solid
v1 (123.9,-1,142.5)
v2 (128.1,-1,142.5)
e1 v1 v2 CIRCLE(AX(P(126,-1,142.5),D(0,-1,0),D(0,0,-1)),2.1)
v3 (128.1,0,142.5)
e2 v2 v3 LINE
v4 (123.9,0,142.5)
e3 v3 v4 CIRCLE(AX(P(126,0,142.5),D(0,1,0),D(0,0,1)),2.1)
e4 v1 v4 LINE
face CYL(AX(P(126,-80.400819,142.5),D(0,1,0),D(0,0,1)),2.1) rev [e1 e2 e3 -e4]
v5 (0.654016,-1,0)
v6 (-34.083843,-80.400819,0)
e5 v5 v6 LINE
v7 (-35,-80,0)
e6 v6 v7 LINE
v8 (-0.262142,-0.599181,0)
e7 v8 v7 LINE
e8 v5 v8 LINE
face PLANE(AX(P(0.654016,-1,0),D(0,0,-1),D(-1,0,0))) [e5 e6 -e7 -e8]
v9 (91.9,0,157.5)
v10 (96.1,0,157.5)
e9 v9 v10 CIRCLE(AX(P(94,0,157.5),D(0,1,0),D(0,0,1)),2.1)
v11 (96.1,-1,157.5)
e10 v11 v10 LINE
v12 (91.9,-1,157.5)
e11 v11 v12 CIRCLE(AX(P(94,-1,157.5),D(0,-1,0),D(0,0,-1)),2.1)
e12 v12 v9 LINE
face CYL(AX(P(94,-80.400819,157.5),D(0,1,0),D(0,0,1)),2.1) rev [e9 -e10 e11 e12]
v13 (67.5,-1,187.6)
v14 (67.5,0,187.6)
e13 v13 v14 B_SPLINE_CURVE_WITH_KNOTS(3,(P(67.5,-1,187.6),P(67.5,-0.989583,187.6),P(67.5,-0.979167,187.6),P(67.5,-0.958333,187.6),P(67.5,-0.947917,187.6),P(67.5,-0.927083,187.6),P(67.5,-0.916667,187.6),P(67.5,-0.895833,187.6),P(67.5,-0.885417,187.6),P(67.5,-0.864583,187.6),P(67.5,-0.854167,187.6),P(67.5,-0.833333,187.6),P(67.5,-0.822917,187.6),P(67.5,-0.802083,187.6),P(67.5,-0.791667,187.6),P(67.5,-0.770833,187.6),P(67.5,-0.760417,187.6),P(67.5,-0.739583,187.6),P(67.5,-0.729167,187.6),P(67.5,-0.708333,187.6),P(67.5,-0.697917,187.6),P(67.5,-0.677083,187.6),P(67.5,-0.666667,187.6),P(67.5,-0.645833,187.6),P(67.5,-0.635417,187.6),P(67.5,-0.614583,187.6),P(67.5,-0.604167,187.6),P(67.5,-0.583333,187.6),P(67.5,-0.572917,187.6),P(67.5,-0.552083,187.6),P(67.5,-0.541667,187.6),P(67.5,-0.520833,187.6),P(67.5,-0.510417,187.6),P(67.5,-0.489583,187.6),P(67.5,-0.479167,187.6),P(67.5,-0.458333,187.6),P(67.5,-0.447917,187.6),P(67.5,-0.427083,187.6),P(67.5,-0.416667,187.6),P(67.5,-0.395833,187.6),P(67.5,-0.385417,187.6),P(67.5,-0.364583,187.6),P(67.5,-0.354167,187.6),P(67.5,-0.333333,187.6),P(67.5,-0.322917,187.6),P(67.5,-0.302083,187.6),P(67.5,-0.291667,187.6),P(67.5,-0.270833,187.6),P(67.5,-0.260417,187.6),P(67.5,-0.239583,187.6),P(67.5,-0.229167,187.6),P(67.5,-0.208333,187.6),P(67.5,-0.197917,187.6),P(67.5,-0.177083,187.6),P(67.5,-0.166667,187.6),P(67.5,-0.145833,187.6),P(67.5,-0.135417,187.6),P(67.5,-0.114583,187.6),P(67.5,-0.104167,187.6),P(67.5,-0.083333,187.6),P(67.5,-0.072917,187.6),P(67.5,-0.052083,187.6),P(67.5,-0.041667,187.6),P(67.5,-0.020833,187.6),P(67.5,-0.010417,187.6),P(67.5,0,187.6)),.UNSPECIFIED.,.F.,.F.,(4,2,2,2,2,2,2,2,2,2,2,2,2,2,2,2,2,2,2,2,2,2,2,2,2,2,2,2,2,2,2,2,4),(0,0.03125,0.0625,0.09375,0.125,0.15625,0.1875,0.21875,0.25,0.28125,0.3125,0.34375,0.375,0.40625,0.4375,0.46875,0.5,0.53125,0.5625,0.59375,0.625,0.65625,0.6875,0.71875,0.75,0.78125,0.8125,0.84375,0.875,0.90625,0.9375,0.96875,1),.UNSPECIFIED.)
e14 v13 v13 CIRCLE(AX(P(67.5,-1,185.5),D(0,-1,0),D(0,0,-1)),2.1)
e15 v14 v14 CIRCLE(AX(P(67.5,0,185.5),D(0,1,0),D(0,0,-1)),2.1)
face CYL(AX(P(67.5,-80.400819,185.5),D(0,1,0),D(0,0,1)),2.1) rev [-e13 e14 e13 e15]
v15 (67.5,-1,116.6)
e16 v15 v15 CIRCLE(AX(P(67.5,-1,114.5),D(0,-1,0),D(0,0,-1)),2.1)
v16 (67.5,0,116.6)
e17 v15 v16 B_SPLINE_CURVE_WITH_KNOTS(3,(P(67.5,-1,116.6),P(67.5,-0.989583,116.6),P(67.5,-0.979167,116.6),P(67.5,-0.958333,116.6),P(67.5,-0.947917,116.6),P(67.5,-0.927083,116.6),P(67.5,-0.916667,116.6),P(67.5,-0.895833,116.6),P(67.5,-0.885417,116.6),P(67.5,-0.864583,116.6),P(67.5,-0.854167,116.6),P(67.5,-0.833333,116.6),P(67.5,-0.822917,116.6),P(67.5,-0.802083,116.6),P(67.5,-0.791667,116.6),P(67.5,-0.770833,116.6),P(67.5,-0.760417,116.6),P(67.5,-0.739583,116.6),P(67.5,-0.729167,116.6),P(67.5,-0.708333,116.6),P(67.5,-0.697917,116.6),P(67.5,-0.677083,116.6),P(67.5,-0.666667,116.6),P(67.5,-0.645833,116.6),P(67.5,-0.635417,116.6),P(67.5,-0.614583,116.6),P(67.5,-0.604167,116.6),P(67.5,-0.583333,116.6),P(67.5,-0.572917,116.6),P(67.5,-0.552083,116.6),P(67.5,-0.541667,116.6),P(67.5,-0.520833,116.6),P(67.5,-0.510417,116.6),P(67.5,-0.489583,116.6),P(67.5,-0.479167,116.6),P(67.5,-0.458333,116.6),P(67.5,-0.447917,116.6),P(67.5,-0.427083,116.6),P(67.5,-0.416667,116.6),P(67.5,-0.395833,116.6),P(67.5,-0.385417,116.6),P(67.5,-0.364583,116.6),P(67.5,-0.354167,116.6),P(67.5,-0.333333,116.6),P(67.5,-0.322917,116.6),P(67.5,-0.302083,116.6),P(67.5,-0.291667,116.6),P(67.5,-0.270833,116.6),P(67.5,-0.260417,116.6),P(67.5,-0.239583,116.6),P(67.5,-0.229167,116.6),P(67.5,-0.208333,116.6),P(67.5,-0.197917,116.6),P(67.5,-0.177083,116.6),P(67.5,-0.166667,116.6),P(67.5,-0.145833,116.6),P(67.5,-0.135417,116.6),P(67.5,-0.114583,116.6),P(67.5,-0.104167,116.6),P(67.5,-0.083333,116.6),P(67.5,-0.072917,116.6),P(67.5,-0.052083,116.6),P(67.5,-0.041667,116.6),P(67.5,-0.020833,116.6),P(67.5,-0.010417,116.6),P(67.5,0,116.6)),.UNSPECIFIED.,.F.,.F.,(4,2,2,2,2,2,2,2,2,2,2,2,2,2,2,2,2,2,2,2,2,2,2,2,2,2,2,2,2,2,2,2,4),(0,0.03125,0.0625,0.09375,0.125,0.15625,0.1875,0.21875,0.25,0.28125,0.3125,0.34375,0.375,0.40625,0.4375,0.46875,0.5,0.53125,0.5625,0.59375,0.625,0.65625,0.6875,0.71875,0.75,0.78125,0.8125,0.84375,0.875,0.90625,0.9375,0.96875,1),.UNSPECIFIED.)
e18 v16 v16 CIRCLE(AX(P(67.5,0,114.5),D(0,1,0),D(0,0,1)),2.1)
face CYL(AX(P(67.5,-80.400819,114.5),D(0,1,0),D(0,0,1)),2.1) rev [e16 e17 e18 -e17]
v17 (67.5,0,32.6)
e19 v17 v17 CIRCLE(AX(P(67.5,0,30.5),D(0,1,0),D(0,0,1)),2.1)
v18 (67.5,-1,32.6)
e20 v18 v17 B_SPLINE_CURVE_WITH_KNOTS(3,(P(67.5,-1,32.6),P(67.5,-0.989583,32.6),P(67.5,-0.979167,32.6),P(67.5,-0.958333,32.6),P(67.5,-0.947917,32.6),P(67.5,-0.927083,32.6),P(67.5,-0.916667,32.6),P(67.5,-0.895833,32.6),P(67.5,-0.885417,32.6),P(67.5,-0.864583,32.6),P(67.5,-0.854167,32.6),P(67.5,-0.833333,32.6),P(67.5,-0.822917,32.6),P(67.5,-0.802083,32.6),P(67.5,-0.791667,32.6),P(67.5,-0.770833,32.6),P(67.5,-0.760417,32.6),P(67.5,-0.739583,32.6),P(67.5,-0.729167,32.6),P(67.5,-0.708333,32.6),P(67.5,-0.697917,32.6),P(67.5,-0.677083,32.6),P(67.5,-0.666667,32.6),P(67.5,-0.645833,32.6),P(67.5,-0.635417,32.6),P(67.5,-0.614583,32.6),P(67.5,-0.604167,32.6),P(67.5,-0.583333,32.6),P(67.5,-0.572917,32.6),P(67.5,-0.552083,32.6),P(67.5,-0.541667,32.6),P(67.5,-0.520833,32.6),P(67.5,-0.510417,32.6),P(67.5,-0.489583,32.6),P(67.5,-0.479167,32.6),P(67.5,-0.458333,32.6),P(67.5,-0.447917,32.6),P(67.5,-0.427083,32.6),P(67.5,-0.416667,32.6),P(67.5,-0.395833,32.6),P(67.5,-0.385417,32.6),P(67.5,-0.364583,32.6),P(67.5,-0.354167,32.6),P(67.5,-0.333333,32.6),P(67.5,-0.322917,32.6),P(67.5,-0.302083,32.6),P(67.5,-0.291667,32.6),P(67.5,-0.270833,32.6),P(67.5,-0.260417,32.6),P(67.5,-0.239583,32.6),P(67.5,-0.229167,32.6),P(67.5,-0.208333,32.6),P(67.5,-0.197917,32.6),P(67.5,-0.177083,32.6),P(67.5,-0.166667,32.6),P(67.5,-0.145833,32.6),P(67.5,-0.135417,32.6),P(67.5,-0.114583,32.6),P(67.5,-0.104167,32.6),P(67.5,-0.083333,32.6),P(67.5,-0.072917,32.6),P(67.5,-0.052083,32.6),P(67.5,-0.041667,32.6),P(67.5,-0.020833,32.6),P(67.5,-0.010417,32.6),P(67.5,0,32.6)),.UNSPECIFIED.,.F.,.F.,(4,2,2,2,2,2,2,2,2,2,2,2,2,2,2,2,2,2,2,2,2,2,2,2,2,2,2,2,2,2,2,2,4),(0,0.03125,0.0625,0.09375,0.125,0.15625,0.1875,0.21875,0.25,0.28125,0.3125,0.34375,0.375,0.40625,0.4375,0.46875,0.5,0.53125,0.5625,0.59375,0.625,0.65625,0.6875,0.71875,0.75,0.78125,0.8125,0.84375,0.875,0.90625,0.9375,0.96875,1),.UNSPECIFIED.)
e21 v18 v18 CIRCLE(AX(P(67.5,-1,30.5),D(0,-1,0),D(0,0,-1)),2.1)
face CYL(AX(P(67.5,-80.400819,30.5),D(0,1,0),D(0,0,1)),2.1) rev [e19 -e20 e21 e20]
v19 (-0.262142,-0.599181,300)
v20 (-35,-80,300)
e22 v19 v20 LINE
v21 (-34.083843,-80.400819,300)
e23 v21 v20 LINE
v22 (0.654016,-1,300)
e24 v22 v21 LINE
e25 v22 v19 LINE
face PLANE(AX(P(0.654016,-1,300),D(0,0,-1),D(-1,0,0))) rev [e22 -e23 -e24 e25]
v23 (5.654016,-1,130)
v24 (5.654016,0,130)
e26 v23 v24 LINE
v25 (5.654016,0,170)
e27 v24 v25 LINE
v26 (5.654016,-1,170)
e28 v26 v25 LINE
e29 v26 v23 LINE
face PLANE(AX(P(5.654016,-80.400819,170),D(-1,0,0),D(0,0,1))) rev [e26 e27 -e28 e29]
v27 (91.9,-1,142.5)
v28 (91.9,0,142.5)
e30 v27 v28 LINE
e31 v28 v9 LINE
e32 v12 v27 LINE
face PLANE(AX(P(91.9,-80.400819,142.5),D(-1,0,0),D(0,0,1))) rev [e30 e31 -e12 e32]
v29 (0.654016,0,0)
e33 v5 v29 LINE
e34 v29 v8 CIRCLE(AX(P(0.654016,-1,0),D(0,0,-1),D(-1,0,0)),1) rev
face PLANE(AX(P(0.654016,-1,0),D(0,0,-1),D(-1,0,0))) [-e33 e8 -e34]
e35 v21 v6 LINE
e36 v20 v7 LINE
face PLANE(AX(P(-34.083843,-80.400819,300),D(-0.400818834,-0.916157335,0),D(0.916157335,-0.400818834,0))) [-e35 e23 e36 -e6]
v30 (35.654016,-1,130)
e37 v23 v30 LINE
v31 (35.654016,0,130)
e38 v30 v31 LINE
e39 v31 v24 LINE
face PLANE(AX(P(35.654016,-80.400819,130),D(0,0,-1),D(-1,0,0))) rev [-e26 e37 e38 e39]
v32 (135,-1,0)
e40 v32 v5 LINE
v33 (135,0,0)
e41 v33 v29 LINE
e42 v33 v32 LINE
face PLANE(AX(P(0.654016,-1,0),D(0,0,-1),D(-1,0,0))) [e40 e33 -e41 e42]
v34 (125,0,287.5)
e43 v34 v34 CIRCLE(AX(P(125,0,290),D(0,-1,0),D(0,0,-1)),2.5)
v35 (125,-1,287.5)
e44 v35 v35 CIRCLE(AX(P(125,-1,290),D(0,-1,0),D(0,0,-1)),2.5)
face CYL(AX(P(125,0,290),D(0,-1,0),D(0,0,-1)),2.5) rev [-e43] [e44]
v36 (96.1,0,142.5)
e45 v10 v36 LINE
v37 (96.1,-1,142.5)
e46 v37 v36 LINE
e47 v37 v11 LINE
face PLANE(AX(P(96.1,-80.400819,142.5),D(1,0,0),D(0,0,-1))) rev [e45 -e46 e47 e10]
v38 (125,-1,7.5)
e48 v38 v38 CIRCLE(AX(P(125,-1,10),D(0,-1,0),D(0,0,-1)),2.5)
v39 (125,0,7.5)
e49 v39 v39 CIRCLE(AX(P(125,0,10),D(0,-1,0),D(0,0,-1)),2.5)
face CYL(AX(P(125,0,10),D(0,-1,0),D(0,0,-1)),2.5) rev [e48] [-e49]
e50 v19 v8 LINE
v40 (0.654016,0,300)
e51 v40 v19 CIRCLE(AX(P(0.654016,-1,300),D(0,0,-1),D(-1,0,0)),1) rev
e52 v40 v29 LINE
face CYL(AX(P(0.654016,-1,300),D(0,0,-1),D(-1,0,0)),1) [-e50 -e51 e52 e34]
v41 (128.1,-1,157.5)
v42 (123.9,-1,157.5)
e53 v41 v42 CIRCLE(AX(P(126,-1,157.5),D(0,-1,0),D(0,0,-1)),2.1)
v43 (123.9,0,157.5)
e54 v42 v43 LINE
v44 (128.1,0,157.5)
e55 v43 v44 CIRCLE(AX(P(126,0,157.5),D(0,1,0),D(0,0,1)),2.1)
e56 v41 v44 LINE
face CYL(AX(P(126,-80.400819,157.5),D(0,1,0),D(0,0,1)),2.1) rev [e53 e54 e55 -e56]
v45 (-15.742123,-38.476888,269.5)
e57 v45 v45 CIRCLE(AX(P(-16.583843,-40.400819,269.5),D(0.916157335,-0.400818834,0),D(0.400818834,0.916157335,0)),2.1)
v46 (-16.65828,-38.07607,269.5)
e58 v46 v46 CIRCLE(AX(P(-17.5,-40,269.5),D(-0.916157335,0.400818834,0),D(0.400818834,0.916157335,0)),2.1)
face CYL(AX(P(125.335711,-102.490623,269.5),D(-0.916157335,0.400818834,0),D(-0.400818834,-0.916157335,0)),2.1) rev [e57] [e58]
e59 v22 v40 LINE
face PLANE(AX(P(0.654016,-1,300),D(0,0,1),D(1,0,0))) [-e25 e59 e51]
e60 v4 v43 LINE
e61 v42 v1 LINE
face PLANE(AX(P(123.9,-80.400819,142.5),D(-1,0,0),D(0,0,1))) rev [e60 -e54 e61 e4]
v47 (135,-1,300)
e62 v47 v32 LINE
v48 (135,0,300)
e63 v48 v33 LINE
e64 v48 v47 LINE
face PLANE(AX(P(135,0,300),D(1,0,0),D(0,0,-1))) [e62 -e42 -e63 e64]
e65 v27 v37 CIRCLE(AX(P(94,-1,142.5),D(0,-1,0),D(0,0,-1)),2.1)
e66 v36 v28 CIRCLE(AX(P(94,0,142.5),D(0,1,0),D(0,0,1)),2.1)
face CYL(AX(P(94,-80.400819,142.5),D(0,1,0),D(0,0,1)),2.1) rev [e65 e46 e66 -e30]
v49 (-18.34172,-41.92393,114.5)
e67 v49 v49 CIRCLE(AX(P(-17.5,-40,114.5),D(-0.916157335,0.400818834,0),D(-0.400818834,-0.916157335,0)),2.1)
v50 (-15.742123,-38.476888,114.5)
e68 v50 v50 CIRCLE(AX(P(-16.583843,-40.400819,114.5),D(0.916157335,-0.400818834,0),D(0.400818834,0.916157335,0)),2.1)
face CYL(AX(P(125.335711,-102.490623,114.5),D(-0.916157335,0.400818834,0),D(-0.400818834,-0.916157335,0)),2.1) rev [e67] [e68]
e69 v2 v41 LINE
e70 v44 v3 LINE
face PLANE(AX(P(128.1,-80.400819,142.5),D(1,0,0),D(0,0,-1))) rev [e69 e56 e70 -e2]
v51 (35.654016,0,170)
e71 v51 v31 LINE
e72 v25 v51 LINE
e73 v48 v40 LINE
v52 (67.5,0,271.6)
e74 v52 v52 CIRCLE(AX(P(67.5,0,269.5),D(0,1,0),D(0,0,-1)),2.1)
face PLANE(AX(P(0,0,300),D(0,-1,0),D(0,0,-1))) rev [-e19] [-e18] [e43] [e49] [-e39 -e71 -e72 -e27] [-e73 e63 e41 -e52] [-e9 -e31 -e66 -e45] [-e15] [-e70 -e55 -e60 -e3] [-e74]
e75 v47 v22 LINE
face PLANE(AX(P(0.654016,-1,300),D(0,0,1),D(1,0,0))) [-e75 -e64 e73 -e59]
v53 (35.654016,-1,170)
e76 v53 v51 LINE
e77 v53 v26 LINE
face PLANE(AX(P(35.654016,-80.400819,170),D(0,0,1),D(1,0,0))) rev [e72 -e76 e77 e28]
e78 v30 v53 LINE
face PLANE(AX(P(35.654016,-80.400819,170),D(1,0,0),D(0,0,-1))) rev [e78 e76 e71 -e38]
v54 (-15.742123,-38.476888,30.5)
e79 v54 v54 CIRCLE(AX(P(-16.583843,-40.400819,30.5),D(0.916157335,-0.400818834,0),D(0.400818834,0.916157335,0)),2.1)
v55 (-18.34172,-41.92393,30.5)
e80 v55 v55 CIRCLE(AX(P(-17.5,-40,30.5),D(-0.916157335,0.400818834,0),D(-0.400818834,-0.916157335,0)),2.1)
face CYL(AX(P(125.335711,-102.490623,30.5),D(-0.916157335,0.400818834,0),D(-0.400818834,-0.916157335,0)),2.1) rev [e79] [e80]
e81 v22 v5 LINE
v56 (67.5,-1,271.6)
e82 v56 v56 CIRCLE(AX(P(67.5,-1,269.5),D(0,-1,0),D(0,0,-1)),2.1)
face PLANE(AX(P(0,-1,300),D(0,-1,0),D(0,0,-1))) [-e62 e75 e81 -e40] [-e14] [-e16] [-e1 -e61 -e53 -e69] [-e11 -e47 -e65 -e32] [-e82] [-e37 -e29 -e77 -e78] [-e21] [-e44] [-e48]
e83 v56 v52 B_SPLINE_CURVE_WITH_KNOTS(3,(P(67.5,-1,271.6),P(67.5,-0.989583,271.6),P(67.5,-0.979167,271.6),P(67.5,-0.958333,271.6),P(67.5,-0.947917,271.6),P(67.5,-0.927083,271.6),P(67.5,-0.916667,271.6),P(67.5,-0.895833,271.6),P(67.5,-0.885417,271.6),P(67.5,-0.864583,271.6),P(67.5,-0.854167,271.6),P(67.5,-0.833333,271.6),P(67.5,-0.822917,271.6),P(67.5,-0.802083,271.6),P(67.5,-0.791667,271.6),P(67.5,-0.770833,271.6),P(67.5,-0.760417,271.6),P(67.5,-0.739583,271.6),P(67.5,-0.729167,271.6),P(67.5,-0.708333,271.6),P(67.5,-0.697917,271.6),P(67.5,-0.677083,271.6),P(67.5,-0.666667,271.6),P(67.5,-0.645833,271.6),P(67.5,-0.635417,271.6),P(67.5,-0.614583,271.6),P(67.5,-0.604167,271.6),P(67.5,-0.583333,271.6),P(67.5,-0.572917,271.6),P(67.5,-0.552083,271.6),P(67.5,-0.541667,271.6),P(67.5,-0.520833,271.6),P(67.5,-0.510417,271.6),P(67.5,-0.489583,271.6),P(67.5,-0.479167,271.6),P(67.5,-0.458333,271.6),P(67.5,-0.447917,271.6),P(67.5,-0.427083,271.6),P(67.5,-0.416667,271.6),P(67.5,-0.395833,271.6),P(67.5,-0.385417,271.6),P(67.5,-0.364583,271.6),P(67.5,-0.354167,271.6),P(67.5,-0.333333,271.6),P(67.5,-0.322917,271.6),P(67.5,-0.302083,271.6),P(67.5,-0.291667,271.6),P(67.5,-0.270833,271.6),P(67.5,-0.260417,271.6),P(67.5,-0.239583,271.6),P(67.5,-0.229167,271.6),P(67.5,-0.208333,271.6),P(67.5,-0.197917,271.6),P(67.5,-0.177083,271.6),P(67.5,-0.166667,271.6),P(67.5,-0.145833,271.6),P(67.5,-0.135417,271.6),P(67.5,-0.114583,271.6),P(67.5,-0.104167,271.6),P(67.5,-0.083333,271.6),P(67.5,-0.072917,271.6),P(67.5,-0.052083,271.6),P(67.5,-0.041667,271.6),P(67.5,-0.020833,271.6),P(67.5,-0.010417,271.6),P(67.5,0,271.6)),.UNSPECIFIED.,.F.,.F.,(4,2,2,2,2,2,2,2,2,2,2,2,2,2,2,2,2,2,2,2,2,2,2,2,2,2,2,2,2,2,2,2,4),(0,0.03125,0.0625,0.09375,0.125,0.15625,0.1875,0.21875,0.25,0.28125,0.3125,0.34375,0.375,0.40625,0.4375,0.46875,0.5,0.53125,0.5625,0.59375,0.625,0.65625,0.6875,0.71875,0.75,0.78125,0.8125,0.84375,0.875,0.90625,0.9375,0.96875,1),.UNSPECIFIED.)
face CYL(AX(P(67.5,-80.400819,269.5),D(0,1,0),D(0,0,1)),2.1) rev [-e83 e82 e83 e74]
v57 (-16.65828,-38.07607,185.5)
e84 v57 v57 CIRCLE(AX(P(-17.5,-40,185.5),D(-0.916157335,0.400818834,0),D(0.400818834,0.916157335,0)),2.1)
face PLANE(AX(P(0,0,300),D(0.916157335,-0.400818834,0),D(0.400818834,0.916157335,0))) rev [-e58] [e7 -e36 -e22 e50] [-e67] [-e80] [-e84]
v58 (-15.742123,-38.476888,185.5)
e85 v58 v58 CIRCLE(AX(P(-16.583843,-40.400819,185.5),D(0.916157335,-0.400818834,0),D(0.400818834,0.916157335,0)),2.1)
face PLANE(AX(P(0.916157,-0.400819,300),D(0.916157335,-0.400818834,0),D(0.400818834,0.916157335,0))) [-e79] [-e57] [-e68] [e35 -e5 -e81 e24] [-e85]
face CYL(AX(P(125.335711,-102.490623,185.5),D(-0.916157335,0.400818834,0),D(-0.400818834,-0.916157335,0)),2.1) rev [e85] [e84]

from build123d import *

# Parameters (mm, degrees)
T_LE_DE_BASE_PLI_E1_DEPTH = 300
ESQUISSE7_R               = 2.5
ENL_V_MAT_EXTRU_1_DEPTH   = 339.42205902
ENL_V_MAT_EXTRU_3_DEPTH   = 339.658074862
ESQUISSE14_W              = 30
ESQUISSE14_H              = 40
ENL_V_MAT_EXTRU_4_DEPTH   = 339.658074862
ESQUISSE15_R              = 2.1
ENL_V_MAT_EXTRU_5_DEPTH   = 339.658074862
ESQUISSE16_R              = 2.1
ENL_V_MAT_EXTRU_6_DEPTH   = 339.658074862


# Read off the part's stored shape, not the designer's step: Tôle de base pliée1
with BuildPart() as part:
    # Tôle de base pliée1 outline → Tôle de base pliée1 (new body)
    with BuildSketch(Plane.XY):
        with BuildLine():
            Line((-0.26214176, -0.599181166), (-35, -80))
            Line((-35, -80), (-34.083842665, -80.400818834))
            Line((-34.083842665, -80.400818834), (0.654015575, -1))
            Line((0.654015575, -1), (135, -1))
            Line((135, -1), (135, 0))
            Line((135, 0), (0.654015575, 0))
            ThreePointArc((0.654015575, 0), (0.10666689, -0.163095336), (-0.26214176, -0.599181166))
        make_face()
    extrude(amount=T_LE_DE_BASE_PLI_E1_DEPTH)

    # Esquisse7 → Enlèv. mat.-Extru.1 (cut, through all)
    with BuildSketch(Plane(origin=(0, -1, 0), x_dir=(-1, 0, 0), z_dir=(0, -1, 0))):
        with Locations(Location((-125, -290, 0), (0, 0, 90))):
            Circle(ESQUISSE7_R)
        with Locations(Location((-125, -10, 0), (0, 0, 90))):
            Circle(ESQUISSE7_R)
    extrude(amount=-ENL_V_MAT_EXTRU_1_DEPTH, mode=Mode.SUBTRACT)

    # Esquisse10 → Enlèv. mat.-Extru.3 (cut, through all)
    with BuildSketch(Plane(origin=(0, 0, 0), x_dir=(1, 0, 0), z_dir=(0, 1, 0))):
        with BuildLine():
            Line((96.1, -142.5), (96.1, -157.5))
            ThreePointArc((96.1, -157.5), (94, -159.6), (91.9, -157.5))
            Line((91.9, -157.5), (91.9, -142.5))
            ThreePointArc((91.9, -142.5), (94, -140.4), (96.1, -142.5))
        make_face()
        with BuildLine():
            Line((128.1, -142.5), (128.1, -157.5))
            ThreePointArc((128.1, -157.5), (126, -159.6), (123.9, -157.5))
            Line((123.9, -157.5), (123.9, -142.5))
            ThreePointArc((123.9, -142.5), (126, -140.4), (128.1, -142.5))
        make_face()
    extrude(amount=-ENL_V_MAT_EXTRU_3_DEPTH, mode=Mode.SUBTRACT)

    # Esquisse14 → Enlèv. mat.-Extru.4 (cut, through all)
    with BuildSketch(Plane(origin=(0, 0, 0), x_dir=(1, 0, 0), z_dir=(0, 1, 0))):
        with Locations((20.654015575, -150)):
            Rectangle(ESQUISSE14_W, ESQUISSE14_H)
    extrude(amount=-ENL_V_MAT_EXTRU_4_DEPTH, mode=Mode.SUBTRACT)

    # Esquisse15 → Enlèv. mat.-Extru.5 (cut, through all)
    with BuildSketch(Plane(origin=(0, 0, 0), x_dir=(1, 0, 0), z_dir=(0, 1, 0))):
        with Locations(Location((67.5, -114.5, 0), (0, 0, 270))):
            Circle(ESQUISSE15_R)
        with Locations(Location((67.5, -30.5, 0), (0, 0, 270))):
            Circle(ESQUISSE15_R)
        with Locations(Location((67.5, -269.5, 0), (0, 0, 270))):
            Circle(ESQUISSE15_R)
        with Locations(Location((67.5, -185.5, 0), (0, 0, 270))):
            Circle(ESQUISSE15_R)
    extrude(amount=-ENL_V_MAT_EXTRU_5_DEPTH, mode=Mode.SUBTRACT)

    # Esquisse16 → Enlèv. mat.-Extru.6 (cut, through all)
    with BuildSketch(Plane(origin=(0, 0, 0), x_dir=(0, 0, 1), z_dir=(-0.9161573349021892, 0.40081883401970764, 0))):
        with Locations(Location((114.5, -43.660622991, 0), (0, 0, 270))):
            Circle(ESQUISSE16_R)
        with Locations(Location((30.5, -43.660622991, 0), (0, 0, 270))):
            Circle(ESQUISSE16_R)
        with Locations(Location((269.5, -43.660622991, 0), (0, 0, 90))):
            Circle(ESQUISSE16_R)
        with Locations(Location((185.5, -43.660622991, 0), (0, 0, 90))):
            Circle(ESQUISSE16_R)
    extrude(amount=-ENL_V_MAT_EXTRU_6_DEPTH, mode=Mode.SUBTRACT)


solid = part.part
